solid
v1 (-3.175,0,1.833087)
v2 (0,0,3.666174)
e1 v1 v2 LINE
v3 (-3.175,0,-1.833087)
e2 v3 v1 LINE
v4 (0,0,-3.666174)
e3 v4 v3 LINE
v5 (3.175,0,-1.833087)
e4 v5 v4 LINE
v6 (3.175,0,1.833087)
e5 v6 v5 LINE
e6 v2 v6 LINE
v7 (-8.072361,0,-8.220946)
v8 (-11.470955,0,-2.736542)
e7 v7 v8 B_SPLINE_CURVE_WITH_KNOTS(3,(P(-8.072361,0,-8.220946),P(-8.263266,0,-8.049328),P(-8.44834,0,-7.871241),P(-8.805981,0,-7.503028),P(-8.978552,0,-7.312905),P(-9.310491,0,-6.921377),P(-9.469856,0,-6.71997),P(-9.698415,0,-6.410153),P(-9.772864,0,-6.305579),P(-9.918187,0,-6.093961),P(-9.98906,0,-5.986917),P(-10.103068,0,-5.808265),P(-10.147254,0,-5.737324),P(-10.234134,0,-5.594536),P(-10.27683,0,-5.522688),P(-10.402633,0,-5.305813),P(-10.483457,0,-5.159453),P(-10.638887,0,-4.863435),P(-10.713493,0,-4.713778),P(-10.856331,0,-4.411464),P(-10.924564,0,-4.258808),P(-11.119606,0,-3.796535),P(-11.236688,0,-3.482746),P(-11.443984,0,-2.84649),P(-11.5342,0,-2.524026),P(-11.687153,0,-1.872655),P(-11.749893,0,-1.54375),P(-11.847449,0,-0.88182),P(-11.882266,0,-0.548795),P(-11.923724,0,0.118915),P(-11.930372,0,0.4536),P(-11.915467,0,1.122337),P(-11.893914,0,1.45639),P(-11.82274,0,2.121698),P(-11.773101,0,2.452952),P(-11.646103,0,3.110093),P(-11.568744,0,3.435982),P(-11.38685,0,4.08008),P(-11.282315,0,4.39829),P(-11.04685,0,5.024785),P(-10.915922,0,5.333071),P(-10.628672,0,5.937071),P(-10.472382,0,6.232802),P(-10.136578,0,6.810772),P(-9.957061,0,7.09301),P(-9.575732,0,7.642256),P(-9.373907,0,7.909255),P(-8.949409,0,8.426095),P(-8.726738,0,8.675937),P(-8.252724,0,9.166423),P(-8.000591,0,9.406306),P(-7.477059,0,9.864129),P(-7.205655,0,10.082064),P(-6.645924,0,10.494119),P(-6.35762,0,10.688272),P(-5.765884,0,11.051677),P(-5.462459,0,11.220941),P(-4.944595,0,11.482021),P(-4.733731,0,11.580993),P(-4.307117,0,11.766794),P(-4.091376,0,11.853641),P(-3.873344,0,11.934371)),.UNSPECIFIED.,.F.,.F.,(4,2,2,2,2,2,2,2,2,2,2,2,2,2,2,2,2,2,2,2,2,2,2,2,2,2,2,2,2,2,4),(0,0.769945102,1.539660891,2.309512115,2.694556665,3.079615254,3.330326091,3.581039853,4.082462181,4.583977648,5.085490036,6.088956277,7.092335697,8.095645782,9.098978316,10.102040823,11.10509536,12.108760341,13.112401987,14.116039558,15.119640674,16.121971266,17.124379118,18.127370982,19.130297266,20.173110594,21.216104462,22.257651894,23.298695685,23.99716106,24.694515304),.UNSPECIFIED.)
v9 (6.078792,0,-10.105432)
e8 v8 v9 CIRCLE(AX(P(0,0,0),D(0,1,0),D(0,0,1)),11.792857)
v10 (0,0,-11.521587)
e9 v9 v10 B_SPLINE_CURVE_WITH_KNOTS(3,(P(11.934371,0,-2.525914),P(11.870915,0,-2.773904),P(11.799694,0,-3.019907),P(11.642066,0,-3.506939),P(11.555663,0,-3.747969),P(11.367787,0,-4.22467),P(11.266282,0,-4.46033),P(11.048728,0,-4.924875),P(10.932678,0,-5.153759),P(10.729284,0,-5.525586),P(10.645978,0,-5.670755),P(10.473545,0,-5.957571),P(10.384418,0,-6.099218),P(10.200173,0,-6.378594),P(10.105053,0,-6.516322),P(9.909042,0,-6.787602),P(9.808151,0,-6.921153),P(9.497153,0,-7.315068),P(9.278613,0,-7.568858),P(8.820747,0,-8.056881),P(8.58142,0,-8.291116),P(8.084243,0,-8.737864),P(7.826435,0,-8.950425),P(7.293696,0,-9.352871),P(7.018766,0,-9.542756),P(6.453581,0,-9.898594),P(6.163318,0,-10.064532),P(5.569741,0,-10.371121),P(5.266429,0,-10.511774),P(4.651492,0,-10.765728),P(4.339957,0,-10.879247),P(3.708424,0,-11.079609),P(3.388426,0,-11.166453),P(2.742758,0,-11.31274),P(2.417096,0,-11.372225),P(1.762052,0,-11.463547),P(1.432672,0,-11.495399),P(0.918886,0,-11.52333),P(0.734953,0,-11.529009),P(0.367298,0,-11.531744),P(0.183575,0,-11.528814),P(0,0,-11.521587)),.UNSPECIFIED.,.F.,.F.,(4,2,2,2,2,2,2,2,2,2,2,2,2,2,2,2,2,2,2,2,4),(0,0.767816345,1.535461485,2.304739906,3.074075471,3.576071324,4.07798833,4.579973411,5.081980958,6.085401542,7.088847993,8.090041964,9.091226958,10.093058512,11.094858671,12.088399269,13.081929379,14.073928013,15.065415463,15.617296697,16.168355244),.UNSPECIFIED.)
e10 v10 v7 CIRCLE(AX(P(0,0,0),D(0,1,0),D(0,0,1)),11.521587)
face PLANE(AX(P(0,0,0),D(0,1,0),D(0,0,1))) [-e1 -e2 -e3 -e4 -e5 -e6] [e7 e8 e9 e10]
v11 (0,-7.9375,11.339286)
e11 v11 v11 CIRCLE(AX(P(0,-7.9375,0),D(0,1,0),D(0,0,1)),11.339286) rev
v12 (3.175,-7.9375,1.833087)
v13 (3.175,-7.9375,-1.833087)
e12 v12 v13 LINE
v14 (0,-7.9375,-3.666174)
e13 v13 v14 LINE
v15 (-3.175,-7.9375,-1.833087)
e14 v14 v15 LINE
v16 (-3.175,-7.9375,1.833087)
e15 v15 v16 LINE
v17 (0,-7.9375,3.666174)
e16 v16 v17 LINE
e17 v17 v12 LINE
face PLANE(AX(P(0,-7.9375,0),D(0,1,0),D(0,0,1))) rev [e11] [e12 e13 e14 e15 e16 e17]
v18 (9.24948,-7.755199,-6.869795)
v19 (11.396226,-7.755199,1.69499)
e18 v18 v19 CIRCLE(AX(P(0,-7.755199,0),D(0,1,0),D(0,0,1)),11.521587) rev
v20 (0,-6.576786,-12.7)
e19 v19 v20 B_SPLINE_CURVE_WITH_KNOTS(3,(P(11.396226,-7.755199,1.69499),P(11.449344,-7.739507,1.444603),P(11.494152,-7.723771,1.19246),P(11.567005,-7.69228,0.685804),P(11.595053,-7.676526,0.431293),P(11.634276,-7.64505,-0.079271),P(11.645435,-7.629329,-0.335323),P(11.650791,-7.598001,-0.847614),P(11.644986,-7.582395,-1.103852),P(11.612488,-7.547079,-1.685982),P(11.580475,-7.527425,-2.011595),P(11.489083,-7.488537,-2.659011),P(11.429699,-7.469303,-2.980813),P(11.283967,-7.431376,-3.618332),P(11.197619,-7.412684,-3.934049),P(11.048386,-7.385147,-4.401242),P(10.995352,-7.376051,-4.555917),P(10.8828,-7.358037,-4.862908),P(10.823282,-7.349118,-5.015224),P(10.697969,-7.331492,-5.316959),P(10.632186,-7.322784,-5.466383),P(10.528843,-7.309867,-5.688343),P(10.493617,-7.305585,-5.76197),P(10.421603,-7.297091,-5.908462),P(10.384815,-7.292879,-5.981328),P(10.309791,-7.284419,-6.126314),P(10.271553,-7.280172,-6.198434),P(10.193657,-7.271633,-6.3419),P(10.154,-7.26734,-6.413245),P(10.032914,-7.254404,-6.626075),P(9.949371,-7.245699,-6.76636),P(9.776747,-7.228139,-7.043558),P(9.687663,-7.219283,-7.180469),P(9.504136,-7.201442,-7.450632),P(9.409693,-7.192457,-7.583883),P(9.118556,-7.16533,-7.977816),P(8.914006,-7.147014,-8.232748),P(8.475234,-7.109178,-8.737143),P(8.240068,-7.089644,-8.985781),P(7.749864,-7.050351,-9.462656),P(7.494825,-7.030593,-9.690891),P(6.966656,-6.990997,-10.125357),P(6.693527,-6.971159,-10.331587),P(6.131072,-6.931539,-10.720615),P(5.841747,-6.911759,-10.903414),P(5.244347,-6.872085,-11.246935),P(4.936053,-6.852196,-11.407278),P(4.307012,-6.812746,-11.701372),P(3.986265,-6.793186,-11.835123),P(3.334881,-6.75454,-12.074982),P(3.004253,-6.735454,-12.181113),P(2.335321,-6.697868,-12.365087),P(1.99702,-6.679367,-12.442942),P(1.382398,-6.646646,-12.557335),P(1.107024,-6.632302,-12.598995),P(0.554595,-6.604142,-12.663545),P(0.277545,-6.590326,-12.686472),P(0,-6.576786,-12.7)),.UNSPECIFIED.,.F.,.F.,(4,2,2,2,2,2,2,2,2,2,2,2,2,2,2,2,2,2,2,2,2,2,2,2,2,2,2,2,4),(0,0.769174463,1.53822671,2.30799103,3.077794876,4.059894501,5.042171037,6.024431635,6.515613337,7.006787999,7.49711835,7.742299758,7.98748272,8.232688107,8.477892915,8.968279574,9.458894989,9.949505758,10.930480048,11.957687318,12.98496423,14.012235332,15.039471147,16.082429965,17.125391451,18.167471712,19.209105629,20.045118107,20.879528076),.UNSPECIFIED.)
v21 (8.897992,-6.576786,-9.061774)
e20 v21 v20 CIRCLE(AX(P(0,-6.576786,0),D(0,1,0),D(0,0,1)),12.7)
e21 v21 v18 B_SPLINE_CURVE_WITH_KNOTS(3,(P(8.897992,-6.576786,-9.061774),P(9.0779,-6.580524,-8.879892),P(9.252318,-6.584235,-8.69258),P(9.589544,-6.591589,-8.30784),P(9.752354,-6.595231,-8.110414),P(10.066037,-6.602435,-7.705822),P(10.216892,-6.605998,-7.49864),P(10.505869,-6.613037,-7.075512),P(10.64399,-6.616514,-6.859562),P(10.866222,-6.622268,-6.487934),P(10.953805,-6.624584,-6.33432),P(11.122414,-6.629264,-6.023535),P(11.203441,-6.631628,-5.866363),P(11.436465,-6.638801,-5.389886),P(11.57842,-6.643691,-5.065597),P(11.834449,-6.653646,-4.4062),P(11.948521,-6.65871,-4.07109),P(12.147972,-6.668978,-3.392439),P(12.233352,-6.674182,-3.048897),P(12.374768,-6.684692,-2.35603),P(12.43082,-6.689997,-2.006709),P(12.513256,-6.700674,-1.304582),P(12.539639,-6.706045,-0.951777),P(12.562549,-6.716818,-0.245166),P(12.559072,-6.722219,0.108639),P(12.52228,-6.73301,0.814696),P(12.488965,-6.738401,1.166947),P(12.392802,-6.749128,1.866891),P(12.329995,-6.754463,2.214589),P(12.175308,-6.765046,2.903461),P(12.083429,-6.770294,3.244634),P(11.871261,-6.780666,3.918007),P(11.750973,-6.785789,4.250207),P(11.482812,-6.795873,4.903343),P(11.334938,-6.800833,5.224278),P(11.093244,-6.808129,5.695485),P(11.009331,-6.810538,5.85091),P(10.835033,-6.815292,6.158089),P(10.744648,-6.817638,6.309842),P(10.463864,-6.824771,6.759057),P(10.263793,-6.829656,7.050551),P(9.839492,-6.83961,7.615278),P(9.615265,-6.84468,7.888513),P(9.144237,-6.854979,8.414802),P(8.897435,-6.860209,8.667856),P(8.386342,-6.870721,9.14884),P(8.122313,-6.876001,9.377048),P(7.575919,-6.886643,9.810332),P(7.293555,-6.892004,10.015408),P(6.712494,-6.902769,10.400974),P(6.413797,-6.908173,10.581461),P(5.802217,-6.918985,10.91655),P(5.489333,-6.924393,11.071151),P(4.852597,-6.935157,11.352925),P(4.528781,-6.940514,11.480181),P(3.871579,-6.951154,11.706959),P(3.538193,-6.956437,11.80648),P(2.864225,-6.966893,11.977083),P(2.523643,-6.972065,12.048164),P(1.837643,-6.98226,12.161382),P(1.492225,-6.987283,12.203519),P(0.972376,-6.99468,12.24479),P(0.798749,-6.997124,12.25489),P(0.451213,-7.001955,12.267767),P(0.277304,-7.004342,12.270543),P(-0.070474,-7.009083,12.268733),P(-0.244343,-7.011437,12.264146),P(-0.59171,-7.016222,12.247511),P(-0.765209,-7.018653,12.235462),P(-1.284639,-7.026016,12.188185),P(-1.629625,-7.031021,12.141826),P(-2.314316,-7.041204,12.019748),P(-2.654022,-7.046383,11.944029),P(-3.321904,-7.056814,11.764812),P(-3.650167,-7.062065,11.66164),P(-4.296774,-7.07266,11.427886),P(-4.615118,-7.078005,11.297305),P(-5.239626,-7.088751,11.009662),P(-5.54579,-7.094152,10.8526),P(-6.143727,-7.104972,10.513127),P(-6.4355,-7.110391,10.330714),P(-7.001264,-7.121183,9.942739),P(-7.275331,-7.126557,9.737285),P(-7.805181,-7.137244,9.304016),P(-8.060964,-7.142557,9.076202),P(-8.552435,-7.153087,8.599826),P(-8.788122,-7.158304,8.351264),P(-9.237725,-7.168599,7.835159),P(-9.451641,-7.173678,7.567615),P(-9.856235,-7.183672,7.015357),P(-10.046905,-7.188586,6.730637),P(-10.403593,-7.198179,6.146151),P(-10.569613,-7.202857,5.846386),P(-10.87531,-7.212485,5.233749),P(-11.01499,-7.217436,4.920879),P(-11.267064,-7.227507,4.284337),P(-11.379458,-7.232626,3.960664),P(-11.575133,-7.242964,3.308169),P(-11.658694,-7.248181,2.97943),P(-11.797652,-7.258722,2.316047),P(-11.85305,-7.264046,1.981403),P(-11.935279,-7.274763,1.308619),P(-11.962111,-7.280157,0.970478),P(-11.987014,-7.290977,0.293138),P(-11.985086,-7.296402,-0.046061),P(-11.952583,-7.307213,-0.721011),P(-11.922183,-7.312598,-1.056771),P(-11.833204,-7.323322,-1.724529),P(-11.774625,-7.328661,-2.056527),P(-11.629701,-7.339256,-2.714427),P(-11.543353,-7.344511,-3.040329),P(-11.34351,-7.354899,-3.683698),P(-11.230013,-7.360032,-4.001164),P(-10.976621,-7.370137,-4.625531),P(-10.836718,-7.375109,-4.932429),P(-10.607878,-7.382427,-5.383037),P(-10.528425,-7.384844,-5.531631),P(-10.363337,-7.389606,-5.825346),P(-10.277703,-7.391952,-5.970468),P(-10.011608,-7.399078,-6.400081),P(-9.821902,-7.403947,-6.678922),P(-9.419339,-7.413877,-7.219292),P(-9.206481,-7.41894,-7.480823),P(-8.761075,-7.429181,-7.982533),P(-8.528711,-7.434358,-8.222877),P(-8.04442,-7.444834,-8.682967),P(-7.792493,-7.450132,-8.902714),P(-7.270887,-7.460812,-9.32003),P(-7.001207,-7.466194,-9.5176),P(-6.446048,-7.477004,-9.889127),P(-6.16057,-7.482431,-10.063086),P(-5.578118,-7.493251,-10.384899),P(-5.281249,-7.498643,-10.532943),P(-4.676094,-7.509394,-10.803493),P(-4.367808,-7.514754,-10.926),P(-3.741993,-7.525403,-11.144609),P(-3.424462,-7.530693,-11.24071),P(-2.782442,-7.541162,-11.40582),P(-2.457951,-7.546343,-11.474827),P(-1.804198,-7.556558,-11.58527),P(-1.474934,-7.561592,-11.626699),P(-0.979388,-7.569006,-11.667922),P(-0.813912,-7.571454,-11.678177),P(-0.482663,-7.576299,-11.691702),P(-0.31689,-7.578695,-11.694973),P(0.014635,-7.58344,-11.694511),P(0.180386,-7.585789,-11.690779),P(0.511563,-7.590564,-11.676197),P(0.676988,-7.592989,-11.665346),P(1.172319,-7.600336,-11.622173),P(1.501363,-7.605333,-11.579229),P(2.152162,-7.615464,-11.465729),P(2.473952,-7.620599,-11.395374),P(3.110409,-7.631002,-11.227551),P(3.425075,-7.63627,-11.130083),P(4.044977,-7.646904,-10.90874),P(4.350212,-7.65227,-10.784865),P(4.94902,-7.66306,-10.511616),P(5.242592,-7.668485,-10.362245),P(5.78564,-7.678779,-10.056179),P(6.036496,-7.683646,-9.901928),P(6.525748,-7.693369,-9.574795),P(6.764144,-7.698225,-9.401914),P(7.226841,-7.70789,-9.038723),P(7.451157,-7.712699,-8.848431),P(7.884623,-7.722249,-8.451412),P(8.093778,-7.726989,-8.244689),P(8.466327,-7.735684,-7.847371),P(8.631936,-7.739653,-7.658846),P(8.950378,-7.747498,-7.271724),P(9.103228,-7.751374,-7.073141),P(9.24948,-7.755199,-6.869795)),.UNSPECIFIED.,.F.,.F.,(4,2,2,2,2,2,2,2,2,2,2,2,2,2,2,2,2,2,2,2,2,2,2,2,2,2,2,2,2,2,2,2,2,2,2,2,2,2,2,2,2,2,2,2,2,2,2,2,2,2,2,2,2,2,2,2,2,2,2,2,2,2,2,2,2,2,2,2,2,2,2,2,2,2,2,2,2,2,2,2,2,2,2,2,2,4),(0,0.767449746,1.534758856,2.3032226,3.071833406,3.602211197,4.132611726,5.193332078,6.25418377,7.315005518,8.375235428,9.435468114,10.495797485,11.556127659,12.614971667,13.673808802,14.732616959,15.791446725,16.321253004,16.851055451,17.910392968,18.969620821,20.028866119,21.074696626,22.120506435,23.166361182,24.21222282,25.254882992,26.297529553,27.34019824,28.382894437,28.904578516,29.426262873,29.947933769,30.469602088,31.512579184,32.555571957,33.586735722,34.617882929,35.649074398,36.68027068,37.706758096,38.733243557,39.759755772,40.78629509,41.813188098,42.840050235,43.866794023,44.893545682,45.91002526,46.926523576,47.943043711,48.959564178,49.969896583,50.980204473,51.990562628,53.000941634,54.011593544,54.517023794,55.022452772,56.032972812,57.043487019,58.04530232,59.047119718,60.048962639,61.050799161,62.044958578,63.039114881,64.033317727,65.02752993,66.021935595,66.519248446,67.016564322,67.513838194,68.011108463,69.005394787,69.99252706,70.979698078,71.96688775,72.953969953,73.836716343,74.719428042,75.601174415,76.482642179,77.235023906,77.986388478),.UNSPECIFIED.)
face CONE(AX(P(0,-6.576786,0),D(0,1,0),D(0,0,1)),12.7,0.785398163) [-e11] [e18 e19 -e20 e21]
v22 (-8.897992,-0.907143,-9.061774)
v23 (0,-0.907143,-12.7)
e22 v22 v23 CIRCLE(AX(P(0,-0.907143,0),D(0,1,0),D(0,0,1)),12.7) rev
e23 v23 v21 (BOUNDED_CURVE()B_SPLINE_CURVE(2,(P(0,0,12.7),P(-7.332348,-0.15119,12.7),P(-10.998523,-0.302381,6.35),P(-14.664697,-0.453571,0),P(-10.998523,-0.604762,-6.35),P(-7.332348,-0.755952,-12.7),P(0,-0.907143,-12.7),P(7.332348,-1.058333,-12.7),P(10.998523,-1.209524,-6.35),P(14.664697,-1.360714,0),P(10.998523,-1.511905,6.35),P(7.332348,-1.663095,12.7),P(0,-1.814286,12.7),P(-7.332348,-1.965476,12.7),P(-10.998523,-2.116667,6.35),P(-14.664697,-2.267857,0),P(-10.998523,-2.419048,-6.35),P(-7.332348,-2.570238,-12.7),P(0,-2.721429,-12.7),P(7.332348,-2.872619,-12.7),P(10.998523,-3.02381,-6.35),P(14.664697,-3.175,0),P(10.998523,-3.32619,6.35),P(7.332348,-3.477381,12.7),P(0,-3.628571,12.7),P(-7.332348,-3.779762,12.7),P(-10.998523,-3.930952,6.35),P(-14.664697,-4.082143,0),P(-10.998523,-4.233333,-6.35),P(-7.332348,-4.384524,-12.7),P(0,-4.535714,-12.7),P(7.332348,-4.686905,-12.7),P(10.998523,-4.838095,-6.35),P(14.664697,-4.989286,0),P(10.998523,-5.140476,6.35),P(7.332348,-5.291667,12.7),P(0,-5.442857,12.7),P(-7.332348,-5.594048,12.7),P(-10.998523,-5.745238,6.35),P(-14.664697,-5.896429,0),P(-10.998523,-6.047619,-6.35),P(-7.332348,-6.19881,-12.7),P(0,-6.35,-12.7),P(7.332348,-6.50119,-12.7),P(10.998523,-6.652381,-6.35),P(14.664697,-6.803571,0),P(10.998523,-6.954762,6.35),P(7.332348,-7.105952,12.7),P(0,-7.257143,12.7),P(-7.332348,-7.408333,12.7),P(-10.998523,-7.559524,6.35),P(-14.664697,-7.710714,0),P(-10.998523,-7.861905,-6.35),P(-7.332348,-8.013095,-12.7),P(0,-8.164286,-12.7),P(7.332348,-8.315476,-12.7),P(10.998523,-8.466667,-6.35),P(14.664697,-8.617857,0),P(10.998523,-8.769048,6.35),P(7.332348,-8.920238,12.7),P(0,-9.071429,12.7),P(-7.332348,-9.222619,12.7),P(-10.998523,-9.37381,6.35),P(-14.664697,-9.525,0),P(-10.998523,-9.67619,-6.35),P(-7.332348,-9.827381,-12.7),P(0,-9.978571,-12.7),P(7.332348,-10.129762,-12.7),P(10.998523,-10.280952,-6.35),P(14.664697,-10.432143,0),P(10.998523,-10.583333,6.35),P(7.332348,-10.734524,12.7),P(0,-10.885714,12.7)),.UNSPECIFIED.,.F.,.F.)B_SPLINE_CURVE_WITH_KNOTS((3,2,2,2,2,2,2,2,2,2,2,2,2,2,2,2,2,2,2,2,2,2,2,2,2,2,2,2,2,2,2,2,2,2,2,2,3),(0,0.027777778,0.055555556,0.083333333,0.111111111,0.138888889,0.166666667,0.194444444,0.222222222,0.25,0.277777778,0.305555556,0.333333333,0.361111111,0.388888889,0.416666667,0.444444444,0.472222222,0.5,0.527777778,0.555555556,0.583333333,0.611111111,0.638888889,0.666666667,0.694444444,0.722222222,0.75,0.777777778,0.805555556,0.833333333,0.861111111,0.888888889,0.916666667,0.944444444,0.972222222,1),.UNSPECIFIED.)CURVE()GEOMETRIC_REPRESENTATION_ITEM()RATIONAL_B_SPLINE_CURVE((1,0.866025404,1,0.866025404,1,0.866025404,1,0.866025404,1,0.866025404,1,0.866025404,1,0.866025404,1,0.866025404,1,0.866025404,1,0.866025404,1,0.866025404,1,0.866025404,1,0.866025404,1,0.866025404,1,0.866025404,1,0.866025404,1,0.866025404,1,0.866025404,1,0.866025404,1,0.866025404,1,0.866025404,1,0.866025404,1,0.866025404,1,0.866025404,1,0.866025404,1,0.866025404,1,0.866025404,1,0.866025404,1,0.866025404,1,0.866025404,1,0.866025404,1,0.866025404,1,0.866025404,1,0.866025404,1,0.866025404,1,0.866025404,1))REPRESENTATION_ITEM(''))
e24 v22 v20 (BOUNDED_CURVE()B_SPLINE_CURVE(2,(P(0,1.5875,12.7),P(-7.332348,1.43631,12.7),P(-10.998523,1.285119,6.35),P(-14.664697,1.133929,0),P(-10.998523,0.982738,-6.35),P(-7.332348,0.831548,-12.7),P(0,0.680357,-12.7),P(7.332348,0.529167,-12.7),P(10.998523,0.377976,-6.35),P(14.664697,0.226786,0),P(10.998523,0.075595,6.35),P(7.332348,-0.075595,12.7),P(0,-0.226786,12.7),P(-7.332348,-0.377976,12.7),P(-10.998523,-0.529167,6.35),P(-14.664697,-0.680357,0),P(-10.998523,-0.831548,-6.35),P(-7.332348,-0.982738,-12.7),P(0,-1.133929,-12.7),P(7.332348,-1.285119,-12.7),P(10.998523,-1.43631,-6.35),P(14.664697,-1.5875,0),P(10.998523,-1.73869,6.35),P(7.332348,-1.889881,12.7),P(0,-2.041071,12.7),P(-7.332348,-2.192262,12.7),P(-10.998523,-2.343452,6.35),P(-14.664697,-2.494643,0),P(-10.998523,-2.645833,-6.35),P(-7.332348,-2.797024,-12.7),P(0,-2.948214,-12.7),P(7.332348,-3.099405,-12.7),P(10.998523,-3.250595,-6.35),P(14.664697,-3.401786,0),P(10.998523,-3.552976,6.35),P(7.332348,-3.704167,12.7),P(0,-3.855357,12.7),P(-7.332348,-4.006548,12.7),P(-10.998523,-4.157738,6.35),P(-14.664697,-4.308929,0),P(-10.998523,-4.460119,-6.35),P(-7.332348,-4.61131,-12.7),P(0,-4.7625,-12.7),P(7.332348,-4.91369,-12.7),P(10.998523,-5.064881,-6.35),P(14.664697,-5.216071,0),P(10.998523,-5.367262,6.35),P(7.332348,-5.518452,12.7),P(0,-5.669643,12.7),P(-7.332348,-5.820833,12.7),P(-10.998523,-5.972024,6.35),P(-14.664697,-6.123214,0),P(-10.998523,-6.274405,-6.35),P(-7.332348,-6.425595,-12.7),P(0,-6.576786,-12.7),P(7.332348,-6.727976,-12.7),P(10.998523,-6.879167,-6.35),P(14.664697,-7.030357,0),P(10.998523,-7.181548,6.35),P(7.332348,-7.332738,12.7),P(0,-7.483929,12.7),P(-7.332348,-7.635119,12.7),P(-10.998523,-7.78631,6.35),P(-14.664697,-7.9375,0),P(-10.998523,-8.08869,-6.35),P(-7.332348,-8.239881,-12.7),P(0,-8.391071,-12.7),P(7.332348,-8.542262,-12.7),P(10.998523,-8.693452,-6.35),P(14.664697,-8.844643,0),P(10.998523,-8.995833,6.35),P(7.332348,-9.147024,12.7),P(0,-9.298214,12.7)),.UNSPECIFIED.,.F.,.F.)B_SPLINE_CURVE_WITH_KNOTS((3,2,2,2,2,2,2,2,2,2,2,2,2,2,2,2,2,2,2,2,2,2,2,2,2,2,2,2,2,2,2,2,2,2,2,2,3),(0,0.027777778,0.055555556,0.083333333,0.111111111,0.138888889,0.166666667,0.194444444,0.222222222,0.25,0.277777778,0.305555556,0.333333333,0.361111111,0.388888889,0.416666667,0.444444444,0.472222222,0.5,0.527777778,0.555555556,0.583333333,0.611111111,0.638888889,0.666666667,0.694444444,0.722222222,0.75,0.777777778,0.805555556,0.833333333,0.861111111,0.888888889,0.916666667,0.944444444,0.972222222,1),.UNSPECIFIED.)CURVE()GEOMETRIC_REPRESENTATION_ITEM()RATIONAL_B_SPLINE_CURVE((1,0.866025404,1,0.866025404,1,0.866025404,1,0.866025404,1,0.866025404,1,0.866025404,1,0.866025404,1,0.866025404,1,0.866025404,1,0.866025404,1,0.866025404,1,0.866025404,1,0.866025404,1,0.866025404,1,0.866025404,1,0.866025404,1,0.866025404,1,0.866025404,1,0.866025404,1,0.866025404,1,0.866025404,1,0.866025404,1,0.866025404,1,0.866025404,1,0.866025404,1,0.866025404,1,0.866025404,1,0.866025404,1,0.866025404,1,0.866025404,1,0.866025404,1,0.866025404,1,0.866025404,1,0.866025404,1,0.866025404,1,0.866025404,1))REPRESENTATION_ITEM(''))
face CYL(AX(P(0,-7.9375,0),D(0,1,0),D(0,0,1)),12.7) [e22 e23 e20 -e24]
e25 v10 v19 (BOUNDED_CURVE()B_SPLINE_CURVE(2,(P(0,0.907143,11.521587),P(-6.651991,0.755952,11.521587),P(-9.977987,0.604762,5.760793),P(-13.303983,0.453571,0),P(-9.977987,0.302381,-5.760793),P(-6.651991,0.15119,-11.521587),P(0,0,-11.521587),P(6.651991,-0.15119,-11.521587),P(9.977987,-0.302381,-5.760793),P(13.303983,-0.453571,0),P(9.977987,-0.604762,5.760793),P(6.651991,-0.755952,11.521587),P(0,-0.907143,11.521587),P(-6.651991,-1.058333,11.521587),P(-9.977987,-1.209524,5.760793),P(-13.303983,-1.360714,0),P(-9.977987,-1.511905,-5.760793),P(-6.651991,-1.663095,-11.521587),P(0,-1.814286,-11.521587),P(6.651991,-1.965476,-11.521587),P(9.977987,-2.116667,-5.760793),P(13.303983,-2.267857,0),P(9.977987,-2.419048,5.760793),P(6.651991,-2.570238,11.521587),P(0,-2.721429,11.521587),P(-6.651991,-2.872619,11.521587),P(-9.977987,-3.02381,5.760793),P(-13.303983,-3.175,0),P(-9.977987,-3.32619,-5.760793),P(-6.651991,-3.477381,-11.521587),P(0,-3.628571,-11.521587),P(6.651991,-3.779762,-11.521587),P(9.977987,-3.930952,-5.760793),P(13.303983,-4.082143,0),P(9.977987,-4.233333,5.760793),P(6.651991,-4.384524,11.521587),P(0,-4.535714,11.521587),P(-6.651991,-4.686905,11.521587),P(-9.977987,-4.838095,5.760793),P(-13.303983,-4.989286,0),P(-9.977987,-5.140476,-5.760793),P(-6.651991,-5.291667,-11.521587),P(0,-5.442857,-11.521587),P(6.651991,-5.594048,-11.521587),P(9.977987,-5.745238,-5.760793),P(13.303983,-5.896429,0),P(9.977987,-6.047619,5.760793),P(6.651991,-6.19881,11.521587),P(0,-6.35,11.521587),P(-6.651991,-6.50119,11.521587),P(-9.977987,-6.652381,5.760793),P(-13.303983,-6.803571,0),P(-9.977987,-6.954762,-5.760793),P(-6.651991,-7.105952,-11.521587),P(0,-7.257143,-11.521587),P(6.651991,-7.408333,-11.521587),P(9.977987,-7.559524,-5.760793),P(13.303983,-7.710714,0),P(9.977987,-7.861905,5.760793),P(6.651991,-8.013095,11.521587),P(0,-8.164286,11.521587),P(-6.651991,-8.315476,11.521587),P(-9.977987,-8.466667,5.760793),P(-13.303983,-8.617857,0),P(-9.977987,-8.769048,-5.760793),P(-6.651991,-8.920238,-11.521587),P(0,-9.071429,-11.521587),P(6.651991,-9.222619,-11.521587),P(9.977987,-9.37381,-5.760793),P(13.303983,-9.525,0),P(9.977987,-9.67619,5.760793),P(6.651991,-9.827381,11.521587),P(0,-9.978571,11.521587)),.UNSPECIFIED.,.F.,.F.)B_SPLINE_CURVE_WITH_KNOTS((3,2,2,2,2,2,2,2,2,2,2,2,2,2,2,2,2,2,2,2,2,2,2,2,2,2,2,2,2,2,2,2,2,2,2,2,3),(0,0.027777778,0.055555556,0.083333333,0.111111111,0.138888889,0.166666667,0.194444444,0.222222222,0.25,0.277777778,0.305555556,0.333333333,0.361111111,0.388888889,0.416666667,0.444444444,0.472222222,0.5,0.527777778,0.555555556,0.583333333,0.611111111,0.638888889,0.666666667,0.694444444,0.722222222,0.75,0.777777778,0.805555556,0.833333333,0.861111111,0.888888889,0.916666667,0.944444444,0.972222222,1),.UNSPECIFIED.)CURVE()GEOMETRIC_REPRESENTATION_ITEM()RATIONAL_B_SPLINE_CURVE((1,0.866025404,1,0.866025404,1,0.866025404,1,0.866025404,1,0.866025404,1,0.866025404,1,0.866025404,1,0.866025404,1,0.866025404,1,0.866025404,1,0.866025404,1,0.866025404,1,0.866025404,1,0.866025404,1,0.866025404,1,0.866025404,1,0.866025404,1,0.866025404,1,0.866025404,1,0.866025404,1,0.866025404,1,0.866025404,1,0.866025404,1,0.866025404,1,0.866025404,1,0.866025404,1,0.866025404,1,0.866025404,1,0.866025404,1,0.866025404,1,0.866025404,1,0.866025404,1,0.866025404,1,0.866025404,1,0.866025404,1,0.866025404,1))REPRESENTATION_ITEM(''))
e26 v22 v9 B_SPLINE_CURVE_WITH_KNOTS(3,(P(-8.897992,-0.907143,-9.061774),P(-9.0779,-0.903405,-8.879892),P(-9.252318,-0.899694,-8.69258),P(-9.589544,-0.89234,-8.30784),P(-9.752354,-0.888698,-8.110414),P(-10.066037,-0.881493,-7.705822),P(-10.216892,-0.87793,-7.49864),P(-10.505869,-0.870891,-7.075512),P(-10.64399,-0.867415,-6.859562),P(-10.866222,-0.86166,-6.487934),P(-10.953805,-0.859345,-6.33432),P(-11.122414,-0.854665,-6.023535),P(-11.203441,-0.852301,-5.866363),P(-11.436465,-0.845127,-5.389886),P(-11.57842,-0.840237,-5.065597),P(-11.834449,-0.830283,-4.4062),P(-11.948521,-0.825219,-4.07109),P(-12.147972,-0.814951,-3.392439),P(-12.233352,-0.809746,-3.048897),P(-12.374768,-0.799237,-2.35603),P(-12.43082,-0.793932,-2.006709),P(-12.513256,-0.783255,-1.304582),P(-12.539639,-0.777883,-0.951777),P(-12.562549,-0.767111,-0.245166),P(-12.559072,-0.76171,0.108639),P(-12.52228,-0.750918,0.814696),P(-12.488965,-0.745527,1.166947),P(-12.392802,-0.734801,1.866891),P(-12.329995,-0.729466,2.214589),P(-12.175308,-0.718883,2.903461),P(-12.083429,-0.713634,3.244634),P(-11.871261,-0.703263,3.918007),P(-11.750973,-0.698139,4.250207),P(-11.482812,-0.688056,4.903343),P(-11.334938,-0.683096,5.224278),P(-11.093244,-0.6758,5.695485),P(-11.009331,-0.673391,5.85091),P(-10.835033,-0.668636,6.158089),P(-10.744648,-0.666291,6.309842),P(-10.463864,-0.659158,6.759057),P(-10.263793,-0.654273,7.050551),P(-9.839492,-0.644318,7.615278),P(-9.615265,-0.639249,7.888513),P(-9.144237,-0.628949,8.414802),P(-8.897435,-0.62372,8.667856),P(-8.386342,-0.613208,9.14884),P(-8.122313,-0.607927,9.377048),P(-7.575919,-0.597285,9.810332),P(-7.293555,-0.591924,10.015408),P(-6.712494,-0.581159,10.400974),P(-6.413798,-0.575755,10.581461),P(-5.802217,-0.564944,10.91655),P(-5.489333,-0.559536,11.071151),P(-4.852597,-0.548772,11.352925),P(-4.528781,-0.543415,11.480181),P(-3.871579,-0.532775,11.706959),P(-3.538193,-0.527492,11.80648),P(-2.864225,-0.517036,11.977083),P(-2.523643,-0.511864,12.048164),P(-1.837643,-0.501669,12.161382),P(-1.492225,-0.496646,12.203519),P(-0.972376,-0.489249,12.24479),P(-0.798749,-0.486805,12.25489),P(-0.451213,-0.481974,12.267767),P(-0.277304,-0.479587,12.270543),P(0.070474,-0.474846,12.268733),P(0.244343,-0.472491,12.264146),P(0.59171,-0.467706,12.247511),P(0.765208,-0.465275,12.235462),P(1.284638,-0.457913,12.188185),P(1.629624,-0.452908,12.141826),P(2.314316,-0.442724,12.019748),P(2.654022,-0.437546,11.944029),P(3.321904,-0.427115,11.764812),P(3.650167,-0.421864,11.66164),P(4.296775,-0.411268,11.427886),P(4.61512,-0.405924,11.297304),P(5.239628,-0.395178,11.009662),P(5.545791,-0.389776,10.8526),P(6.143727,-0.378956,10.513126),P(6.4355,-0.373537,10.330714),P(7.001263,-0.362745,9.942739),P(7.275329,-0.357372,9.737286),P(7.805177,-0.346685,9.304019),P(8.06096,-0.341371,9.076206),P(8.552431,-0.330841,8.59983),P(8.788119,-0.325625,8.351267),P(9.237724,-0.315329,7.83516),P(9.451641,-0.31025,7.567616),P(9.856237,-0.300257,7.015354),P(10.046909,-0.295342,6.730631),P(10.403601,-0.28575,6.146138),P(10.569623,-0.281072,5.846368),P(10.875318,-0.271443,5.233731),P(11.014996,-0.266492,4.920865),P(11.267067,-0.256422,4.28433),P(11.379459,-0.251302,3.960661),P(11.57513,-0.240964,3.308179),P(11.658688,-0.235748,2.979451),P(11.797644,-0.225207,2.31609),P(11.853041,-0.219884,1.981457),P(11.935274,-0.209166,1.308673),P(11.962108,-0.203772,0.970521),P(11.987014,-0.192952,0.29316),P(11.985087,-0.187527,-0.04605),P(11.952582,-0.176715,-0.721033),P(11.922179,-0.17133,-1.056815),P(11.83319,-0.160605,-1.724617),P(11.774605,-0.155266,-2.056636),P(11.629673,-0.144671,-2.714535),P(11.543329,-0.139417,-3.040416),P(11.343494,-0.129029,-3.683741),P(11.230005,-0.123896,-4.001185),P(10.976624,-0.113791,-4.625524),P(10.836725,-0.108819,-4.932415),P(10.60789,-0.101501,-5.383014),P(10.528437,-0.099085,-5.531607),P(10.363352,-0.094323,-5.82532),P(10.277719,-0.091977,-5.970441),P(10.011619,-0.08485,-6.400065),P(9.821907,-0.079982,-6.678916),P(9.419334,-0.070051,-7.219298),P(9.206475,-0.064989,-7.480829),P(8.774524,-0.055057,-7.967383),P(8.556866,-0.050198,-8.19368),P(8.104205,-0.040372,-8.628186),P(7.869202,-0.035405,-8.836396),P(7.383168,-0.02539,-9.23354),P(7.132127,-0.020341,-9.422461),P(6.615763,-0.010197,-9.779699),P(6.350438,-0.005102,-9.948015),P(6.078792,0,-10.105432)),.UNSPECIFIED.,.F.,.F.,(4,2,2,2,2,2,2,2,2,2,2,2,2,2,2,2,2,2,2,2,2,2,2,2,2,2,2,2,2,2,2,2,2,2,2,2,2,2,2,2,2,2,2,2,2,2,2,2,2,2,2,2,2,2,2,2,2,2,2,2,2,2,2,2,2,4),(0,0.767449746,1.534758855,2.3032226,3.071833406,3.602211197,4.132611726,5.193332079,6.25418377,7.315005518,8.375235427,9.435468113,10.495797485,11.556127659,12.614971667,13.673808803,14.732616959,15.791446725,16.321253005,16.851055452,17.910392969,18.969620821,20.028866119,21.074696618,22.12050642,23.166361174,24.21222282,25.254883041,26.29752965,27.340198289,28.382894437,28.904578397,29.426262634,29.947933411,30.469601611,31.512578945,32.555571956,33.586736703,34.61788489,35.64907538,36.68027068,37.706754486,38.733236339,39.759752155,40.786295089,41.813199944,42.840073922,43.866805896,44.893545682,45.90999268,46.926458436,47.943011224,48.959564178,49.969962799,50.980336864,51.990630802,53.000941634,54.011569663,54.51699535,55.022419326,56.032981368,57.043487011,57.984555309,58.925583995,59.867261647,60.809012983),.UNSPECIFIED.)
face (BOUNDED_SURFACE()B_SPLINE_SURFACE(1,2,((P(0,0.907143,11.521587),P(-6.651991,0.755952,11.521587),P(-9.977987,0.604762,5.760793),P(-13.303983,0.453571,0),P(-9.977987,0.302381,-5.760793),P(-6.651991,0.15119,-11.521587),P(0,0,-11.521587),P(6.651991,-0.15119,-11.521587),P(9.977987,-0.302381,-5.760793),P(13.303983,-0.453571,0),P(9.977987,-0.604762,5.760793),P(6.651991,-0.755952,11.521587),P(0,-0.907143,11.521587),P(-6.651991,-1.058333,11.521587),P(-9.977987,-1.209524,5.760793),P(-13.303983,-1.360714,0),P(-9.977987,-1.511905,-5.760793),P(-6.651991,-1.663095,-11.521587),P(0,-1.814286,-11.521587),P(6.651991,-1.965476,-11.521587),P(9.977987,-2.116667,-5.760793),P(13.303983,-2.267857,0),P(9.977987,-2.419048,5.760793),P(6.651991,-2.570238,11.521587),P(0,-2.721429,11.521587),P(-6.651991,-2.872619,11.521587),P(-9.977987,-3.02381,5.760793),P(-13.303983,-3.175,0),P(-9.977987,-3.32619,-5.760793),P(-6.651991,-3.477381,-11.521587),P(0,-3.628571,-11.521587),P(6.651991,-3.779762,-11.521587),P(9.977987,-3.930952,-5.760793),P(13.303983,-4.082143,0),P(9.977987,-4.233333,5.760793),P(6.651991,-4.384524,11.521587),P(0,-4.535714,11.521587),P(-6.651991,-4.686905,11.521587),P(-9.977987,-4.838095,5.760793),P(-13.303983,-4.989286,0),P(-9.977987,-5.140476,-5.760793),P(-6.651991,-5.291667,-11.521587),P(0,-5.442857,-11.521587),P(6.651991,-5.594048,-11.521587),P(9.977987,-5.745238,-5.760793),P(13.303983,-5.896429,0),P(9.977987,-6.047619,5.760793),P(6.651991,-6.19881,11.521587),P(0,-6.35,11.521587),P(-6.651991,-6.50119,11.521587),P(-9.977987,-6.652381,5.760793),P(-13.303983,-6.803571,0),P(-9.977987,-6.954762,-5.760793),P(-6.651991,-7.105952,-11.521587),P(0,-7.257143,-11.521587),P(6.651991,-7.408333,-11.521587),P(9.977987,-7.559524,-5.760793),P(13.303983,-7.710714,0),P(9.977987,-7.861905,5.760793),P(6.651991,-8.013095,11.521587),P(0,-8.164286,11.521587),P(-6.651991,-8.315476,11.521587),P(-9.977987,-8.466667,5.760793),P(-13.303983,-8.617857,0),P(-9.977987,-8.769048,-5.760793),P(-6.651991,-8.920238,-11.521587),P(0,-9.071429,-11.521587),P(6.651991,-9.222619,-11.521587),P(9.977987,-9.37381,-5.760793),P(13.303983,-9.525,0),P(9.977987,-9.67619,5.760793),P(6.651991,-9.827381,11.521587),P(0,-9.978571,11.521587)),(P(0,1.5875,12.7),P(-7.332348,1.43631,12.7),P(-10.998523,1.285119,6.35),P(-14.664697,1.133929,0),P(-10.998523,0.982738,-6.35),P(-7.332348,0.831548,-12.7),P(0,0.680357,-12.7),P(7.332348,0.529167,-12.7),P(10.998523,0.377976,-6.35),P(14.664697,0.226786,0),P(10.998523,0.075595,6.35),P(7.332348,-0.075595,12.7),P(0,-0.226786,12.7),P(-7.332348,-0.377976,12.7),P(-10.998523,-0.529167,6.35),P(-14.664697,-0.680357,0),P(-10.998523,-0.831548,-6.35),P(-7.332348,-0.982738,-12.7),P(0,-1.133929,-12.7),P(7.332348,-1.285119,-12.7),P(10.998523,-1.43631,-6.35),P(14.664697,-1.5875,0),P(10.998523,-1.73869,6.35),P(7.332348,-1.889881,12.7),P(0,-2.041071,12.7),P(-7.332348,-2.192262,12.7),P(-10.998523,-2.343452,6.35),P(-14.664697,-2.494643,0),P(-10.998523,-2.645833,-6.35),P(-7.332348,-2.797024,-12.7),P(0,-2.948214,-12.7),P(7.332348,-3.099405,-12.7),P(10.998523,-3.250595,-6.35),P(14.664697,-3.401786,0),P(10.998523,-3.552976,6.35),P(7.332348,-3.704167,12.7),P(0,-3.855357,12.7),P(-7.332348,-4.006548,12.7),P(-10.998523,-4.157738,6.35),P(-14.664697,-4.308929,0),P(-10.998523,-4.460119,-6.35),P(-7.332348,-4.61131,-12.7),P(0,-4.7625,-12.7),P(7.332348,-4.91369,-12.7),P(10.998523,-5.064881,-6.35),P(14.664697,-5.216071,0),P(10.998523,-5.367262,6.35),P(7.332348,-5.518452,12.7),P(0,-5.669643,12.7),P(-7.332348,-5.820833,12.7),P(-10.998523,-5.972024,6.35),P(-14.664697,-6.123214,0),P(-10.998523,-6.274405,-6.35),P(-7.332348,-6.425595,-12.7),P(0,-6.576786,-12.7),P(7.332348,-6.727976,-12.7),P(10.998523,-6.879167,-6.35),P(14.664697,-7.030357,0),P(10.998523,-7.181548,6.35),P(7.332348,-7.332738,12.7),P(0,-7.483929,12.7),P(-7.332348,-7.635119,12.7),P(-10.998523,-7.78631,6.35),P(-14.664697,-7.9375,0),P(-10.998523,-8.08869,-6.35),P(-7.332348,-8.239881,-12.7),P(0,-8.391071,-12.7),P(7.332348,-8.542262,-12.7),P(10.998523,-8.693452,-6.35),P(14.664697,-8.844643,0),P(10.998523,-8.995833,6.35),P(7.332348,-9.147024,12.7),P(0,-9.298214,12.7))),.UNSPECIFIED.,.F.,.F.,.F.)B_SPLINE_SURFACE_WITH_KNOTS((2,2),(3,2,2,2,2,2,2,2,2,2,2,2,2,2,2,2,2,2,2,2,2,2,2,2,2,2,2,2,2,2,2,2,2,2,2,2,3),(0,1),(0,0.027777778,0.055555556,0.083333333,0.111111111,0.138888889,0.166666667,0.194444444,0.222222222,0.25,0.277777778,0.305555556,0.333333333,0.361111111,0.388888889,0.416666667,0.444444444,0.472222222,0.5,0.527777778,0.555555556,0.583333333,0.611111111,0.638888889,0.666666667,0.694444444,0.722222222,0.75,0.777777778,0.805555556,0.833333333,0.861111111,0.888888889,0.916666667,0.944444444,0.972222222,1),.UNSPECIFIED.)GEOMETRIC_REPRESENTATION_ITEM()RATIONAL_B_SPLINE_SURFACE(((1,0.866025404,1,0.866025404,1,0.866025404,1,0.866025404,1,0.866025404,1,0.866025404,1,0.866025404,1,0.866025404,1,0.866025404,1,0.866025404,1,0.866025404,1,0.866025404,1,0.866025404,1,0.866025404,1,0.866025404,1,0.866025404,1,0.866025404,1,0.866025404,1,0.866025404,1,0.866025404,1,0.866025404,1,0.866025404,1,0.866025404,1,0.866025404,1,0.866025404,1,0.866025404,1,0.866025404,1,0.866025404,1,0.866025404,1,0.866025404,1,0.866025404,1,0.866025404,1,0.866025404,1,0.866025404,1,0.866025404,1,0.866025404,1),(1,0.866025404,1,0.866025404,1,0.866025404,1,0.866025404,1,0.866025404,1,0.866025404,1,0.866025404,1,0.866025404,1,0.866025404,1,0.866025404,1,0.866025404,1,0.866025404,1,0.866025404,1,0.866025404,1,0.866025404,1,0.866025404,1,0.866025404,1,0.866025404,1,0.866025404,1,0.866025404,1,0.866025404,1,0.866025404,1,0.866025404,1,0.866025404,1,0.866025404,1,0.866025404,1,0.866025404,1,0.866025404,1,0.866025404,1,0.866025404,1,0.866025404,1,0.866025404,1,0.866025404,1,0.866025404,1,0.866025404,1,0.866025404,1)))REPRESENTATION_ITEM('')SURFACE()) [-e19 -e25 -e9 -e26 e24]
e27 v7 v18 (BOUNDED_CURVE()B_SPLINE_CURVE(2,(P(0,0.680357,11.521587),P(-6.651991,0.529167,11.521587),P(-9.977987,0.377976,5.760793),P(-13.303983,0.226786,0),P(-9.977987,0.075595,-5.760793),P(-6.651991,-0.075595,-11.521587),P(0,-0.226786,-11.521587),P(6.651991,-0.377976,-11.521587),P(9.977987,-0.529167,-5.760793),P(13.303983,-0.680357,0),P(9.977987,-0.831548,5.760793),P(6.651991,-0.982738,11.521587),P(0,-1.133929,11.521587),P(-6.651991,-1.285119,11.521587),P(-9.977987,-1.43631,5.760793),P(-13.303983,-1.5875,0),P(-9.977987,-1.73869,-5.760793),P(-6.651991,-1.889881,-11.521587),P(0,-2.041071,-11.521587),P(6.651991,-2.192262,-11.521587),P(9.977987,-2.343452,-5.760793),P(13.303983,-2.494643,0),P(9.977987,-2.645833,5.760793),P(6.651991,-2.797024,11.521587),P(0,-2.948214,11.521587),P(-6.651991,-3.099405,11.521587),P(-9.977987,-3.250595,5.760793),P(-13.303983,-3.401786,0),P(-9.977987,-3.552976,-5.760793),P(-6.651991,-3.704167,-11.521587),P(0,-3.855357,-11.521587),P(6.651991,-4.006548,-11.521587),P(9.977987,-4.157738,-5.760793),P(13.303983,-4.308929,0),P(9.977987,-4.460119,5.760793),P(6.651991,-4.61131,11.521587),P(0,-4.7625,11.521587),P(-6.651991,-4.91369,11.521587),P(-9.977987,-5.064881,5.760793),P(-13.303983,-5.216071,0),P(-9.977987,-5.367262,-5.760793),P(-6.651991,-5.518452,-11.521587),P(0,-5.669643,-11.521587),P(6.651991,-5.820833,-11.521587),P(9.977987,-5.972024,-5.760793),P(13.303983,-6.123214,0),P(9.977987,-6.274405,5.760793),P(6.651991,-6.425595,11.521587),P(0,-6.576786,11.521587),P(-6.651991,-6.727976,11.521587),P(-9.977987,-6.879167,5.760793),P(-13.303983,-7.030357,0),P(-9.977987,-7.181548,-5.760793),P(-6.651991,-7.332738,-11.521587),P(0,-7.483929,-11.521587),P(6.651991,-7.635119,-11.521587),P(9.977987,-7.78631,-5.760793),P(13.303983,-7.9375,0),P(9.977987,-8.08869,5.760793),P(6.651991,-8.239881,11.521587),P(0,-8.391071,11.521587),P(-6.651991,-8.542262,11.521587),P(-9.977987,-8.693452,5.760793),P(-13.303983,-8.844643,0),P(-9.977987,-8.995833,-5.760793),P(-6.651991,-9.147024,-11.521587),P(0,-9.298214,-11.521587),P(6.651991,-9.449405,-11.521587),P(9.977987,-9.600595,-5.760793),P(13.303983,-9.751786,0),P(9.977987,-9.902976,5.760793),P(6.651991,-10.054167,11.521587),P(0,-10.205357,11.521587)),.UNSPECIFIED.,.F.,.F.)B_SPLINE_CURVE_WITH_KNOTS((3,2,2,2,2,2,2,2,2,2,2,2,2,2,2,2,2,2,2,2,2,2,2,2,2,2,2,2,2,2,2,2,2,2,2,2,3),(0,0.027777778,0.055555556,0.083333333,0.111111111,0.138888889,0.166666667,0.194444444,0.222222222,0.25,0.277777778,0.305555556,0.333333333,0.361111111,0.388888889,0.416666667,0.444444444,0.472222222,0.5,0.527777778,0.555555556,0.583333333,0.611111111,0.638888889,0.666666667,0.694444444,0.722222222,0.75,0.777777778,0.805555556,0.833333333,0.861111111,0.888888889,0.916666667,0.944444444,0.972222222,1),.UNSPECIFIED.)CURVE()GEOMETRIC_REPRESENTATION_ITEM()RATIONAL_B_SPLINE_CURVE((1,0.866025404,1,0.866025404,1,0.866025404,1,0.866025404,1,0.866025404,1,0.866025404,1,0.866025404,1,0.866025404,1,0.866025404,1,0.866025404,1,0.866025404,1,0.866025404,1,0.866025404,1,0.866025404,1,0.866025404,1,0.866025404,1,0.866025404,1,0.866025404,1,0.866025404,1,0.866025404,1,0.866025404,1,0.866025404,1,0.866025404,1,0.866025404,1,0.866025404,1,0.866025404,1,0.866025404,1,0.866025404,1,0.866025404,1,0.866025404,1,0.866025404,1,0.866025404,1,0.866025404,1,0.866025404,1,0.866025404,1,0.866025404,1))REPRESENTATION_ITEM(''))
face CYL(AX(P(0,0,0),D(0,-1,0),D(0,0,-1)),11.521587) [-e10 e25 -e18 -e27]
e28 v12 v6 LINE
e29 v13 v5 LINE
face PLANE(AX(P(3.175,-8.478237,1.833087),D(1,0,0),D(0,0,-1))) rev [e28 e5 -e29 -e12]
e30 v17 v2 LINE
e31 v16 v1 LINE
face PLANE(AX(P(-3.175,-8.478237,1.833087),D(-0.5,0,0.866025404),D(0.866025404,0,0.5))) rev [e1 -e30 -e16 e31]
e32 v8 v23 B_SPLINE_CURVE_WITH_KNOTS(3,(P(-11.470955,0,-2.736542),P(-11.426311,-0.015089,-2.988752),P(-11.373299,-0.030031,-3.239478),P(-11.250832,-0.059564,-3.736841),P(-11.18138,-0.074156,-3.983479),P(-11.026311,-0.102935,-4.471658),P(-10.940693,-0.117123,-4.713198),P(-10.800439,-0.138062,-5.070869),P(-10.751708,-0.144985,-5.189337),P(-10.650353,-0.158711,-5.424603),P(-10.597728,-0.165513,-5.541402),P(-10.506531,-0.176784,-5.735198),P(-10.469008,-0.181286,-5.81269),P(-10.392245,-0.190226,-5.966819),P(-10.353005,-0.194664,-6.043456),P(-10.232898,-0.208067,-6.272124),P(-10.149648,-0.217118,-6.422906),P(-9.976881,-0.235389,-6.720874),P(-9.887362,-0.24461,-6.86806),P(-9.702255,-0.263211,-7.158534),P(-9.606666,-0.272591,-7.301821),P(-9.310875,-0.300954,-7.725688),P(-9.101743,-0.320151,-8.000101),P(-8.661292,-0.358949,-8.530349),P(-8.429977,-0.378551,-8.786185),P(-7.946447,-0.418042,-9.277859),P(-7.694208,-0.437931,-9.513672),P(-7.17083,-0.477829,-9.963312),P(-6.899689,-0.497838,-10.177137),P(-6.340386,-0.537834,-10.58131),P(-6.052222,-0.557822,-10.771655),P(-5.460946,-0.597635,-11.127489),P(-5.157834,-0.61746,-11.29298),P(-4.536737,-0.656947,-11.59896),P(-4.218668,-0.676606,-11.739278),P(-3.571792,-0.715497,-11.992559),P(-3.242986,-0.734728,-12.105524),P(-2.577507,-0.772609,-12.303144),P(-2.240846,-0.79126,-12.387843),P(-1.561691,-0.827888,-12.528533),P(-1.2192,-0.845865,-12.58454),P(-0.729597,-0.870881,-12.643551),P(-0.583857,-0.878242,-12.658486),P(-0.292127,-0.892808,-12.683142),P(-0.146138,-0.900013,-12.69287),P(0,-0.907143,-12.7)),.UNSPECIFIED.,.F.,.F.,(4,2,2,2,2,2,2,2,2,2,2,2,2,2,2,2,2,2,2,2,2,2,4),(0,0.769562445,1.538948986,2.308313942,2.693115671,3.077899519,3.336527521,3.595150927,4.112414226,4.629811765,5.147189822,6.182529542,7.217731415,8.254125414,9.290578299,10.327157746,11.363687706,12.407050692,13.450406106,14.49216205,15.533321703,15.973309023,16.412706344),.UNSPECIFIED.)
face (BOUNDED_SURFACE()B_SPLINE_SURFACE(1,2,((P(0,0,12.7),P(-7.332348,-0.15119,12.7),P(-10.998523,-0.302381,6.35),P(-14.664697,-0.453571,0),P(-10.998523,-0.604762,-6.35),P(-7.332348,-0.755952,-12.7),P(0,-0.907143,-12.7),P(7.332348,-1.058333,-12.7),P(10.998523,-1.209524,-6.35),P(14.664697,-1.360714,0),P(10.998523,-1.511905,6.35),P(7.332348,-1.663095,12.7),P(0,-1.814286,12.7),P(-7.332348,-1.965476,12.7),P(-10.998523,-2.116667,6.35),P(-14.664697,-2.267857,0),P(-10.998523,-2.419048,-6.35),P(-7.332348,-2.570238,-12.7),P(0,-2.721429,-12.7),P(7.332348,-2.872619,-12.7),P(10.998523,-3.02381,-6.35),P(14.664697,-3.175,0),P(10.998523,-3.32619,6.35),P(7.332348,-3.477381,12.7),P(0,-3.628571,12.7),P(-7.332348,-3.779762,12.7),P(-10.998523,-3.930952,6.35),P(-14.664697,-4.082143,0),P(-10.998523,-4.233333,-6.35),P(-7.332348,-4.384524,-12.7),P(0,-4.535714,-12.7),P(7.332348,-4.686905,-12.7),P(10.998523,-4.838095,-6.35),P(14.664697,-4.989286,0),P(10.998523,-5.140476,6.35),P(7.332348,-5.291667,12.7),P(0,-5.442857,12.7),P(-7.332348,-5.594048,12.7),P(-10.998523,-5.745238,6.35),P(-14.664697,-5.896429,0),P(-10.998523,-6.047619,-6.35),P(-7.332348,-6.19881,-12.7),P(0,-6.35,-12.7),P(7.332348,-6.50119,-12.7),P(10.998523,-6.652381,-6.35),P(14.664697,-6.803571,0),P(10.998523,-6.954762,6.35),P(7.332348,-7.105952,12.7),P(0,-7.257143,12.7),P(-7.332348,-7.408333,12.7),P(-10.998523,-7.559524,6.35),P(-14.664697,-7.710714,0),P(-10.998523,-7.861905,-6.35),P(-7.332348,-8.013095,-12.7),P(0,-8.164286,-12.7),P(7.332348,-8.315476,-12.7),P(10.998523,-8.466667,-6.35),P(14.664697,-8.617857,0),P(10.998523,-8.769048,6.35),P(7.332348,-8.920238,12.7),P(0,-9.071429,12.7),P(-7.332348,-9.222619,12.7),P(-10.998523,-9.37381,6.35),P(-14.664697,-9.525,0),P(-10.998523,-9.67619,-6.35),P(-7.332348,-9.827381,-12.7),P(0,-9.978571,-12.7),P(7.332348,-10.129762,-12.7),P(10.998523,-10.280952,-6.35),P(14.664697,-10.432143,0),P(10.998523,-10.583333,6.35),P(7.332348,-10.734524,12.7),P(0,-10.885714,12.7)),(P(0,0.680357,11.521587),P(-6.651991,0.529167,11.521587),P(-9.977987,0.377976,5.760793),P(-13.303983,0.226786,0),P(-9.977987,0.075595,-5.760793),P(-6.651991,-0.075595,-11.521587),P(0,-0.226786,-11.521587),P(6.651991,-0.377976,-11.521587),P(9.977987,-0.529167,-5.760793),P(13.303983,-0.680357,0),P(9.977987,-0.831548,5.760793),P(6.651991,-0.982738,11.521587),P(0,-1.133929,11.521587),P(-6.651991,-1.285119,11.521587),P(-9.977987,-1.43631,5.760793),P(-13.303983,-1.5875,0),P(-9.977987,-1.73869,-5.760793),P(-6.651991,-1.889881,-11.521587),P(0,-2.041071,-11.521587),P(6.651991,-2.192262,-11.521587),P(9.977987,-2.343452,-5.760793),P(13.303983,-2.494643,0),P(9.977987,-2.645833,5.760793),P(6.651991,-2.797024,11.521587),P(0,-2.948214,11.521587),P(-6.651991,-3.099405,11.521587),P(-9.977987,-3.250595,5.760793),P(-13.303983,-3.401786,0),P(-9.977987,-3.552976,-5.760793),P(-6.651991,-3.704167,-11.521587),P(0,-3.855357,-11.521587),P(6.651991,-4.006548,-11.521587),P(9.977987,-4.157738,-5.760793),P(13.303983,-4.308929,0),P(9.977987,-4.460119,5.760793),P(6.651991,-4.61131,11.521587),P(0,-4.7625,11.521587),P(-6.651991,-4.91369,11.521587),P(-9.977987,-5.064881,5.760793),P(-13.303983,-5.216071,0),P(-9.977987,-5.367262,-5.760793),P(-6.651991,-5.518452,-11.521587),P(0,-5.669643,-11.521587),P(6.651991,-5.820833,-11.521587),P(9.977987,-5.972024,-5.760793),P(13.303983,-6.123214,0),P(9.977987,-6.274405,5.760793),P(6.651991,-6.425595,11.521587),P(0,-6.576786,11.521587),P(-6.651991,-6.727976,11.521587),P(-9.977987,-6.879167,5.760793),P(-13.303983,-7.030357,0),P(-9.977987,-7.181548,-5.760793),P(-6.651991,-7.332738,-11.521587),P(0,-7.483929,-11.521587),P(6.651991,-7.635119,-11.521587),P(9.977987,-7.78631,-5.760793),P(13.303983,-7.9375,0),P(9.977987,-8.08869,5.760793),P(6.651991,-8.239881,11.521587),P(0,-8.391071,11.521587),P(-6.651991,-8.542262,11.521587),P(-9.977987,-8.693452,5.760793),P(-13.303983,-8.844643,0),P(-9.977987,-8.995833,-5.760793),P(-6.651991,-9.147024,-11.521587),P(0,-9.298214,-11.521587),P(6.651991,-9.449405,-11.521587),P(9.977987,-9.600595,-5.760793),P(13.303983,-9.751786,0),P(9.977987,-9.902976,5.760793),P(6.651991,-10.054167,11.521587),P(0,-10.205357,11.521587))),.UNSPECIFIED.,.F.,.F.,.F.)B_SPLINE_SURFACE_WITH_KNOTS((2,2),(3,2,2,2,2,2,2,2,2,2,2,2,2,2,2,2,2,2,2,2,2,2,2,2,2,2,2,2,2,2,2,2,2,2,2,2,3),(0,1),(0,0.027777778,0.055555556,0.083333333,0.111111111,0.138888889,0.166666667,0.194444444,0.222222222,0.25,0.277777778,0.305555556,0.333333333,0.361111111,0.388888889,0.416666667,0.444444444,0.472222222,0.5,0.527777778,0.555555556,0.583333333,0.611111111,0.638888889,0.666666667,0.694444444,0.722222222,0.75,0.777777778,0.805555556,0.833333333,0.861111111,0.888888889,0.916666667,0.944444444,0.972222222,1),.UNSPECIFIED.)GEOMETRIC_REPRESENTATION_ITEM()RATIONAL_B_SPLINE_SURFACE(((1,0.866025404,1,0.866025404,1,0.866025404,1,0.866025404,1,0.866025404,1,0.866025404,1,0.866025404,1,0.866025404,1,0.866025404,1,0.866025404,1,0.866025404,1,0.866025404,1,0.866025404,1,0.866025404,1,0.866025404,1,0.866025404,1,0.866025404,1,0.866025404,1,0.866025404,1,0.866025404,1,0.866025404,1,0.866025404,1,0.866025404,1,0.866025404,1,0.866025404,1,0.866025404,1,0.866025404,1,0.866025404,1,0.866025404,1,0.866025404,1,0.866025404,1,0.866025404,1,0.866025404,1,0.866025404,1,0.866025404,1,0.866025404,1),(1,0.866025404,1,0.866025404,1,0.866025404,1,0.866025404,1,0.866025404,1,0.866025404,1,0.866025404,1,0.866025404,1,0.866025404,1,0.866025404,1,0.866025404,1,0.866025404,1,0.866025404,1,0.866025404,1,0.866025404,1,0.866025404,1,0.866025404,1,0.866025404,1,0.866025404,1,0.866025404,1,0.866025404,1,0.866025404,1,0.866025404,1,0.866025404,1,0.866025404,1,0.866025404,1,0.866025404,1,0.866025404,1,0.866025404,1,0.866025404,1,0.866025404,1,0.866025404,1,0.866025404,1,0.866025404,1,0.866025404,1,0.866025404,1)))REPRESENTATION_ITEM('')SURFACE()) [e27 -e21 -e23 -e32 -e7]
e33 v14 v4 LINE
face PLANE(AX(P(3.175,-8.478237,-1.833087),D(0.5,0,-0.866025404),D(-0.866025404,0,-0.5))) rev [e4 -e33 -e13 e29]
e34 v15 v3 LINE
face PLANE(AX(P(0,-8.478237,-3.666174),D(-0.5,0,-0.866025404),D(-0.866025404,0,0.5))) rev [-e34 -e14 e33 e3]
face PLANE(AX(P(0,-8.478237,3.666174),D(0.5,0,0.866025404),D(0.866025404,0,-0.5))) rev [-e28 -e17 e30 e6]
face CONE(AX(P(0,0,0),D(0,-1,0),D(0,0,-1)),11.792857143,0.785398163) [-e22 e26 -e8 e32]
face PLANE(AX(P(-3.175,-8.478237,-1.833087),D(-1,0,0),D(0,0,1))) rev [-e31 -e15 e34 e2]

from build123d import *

# Parameters (mm, degrees)
SKETCH1_R          = 12.7
EXTRUDE1_DEPTH     = 7.9375
CHAMFER1_SIZE      = 1.360714286
CHAMFER2_SIZE      = 0.907142857
CUT_SWEEP1_PITCH   = 1.814285714
CUT_EXTRUDE1_DEPTH = 20.636290712


with BuildPart() as part:
    # Sketch1 → Extrude1 (new body)
    with BuildSketch(Plane(origin=(0, 0, 0), x_dir=(1, 0, 0), z_dir=(0, 1, 0))):
        with Locations(Location((0, 0, 0), (0, 0, 270))):
            Circle(SKETCH1_R)
    extrude(amount=-EXTRUDE1_DEPTH)

    # Chamfer1
    chamfer1_edges = [part.edges().sort_by_distance(p)[0] for p in [
        (0, -7.9375, -12.7),
    ]]
    chamfer(chamfer1_edges, length=CHAMFER1_SIZE)

    # Chamfer2
    chamfer2_edges = [part.edges().sort_by_distance(p)[0] for p in [
        (0, 0, -12.7),
    ]]
    chamfer(chamfer2_edges, length=CHAMFER2_SIZE)

    # Cut-Sweep1: the profile of Sketch3 profile screwed along a right-hand helix of 5.375 turns, 6 arcs to a turn; built about Z, then put on its axis
    cut_sweep1_z = Axis((0, 0, 0), (0, 0, 1))
    cut_sweep1_corners = [(12.7003, 0, 0.000173205), (11.521586861, 0, -0.680357143), (11.521586861, 0, -0.907142857), (12.7003, 0, -1.587673205)]
    with BuildLine(mode=Mode.PRIVATE) as cut_sweep1_profile:
        Line(cut_sweep1_corners[0], cut_sweep1_corners[1])
        Line(cut_sweep1_corners[1], cut_sweep1_corners[2])
        Line(cut_sweep1_corners[2], cut_sweep1_corners[3])
        Line(cut_sweep1_corners[3], cut_sweep1_corners[0])
    cut_sweep1_cap = Face(cut_sweep1_profile.wire())
    cut_sweep1_turn_angles = [0, 30, 60, 90, 120, 150, 180, 210, 240, 270, 300, 330, 360]
    cut_sweep1_turn_weights = [1, 0.8660254037844387, 1, 0.8660254037844387, 1, 0.8660254037844387, 1, 0.8660254037844387, 1, 0.8660254037844387, 1, 0.8660254037844387, 1]
    cut_sweep1_turn_rails = [Edge.make_bspline([Vector(p[0], p[1], 0).rotate(cut_sweep1_z, cut_sweep1_turn_angles[k]) / cut_sweep1_turn_weights[k] + Vector(0, 0, p[2] + CUT_SWEEP1_PITCH * cut_sweep1_turn_angles[k] / 360) for k in range(13)], [0, 0, 0, 1, 1, 2, 2, 3, 3, 4, 4, 5, 5, 6, 6, 6], 2, cut_sweep1_turn_weights) for p in cut_sweep1_corners]
    cut_sweep1_turn_sides = [Face.make_surface_from_curves(cut_sweep1_turn_rails[p[0]], cut_sweep1_turn_rails[p[1]]) for p in [(0, 1), (1, 2), (2, 3), (3, 0)]]
    cut_sweep1_last_angles = [1800, 1830, 1860, 1890, 1920, 1927.5, 1935]
    cut_sweep1_last_weights = [1, 0.8660254037844387, 1, 0.8660254037844387, 1, 0.991444861373807, 1]
    cut_sweep1_last_rails = [Edge.make_bspline([Vector(p[0], p[1], 0).rotate(cut_sweep1_z, cut_sweep1_last_angles[k]) / cut_sweep1_last_weights[k] + Vector(0, 0, p[2] + CUT_SWEEP1_PITCH * cut_sweep1_last_angles[k] / 360) for k in range(7)], [0, 0, 0, 1, 1, 2, 2, 3, 3, 3], 2, cut_sweep1_last_weights) for p in cut_sweep1_corners]
    cut_sweep1_last_sides = [Face.make_surface_from_curves(cut_sweep1_last_rails[p[0]], cut_sweep1_last_rails[p[1]]) for p in [(0, 1), (1, 2), (2, 3), (3, 0)]]
    cut_sweep1 = Plane(origin=(0, 0, 0), x_dir=(0, 0, 1), z_dir=(0, -1, 0)) * Solid(Shell([*[p.moved(Location((0, 0, CUT_SWEEP1_PITCH * i))) for i in range(5) for p in cut_sweep1_turn_sides], *cut_sweep1_last_sides, cut_sweep1_cap, cut_sweep1_cap.rotate(cut_sweep1_z, 1935).moved(Location((0, 0, CUT_SWEEP1_PITCH * 1935 / 360)))]))
    add(cut_sweep1, mode=Mode.SUBTRACT)

    # Sketch4 → Cut-Extrude1 (cut, through all)
    with BuildSketch(Plane(origin=(0, 0, 0), x_dir=(1, 0, 0), z_dir=(0, 1, 0))):
        Polygon((0, 3.666174209), (-3.175, 1.833087105), (-3.175, -1.833087105), (0, -3.666174209), (3.175, -1.833087105), (3.175, 1.833087105), align=None)
    extrude(amount=-CUT_EXTRUDE1_DEPTH, mode=Mode.SUBTRACT)


solid = part.part
